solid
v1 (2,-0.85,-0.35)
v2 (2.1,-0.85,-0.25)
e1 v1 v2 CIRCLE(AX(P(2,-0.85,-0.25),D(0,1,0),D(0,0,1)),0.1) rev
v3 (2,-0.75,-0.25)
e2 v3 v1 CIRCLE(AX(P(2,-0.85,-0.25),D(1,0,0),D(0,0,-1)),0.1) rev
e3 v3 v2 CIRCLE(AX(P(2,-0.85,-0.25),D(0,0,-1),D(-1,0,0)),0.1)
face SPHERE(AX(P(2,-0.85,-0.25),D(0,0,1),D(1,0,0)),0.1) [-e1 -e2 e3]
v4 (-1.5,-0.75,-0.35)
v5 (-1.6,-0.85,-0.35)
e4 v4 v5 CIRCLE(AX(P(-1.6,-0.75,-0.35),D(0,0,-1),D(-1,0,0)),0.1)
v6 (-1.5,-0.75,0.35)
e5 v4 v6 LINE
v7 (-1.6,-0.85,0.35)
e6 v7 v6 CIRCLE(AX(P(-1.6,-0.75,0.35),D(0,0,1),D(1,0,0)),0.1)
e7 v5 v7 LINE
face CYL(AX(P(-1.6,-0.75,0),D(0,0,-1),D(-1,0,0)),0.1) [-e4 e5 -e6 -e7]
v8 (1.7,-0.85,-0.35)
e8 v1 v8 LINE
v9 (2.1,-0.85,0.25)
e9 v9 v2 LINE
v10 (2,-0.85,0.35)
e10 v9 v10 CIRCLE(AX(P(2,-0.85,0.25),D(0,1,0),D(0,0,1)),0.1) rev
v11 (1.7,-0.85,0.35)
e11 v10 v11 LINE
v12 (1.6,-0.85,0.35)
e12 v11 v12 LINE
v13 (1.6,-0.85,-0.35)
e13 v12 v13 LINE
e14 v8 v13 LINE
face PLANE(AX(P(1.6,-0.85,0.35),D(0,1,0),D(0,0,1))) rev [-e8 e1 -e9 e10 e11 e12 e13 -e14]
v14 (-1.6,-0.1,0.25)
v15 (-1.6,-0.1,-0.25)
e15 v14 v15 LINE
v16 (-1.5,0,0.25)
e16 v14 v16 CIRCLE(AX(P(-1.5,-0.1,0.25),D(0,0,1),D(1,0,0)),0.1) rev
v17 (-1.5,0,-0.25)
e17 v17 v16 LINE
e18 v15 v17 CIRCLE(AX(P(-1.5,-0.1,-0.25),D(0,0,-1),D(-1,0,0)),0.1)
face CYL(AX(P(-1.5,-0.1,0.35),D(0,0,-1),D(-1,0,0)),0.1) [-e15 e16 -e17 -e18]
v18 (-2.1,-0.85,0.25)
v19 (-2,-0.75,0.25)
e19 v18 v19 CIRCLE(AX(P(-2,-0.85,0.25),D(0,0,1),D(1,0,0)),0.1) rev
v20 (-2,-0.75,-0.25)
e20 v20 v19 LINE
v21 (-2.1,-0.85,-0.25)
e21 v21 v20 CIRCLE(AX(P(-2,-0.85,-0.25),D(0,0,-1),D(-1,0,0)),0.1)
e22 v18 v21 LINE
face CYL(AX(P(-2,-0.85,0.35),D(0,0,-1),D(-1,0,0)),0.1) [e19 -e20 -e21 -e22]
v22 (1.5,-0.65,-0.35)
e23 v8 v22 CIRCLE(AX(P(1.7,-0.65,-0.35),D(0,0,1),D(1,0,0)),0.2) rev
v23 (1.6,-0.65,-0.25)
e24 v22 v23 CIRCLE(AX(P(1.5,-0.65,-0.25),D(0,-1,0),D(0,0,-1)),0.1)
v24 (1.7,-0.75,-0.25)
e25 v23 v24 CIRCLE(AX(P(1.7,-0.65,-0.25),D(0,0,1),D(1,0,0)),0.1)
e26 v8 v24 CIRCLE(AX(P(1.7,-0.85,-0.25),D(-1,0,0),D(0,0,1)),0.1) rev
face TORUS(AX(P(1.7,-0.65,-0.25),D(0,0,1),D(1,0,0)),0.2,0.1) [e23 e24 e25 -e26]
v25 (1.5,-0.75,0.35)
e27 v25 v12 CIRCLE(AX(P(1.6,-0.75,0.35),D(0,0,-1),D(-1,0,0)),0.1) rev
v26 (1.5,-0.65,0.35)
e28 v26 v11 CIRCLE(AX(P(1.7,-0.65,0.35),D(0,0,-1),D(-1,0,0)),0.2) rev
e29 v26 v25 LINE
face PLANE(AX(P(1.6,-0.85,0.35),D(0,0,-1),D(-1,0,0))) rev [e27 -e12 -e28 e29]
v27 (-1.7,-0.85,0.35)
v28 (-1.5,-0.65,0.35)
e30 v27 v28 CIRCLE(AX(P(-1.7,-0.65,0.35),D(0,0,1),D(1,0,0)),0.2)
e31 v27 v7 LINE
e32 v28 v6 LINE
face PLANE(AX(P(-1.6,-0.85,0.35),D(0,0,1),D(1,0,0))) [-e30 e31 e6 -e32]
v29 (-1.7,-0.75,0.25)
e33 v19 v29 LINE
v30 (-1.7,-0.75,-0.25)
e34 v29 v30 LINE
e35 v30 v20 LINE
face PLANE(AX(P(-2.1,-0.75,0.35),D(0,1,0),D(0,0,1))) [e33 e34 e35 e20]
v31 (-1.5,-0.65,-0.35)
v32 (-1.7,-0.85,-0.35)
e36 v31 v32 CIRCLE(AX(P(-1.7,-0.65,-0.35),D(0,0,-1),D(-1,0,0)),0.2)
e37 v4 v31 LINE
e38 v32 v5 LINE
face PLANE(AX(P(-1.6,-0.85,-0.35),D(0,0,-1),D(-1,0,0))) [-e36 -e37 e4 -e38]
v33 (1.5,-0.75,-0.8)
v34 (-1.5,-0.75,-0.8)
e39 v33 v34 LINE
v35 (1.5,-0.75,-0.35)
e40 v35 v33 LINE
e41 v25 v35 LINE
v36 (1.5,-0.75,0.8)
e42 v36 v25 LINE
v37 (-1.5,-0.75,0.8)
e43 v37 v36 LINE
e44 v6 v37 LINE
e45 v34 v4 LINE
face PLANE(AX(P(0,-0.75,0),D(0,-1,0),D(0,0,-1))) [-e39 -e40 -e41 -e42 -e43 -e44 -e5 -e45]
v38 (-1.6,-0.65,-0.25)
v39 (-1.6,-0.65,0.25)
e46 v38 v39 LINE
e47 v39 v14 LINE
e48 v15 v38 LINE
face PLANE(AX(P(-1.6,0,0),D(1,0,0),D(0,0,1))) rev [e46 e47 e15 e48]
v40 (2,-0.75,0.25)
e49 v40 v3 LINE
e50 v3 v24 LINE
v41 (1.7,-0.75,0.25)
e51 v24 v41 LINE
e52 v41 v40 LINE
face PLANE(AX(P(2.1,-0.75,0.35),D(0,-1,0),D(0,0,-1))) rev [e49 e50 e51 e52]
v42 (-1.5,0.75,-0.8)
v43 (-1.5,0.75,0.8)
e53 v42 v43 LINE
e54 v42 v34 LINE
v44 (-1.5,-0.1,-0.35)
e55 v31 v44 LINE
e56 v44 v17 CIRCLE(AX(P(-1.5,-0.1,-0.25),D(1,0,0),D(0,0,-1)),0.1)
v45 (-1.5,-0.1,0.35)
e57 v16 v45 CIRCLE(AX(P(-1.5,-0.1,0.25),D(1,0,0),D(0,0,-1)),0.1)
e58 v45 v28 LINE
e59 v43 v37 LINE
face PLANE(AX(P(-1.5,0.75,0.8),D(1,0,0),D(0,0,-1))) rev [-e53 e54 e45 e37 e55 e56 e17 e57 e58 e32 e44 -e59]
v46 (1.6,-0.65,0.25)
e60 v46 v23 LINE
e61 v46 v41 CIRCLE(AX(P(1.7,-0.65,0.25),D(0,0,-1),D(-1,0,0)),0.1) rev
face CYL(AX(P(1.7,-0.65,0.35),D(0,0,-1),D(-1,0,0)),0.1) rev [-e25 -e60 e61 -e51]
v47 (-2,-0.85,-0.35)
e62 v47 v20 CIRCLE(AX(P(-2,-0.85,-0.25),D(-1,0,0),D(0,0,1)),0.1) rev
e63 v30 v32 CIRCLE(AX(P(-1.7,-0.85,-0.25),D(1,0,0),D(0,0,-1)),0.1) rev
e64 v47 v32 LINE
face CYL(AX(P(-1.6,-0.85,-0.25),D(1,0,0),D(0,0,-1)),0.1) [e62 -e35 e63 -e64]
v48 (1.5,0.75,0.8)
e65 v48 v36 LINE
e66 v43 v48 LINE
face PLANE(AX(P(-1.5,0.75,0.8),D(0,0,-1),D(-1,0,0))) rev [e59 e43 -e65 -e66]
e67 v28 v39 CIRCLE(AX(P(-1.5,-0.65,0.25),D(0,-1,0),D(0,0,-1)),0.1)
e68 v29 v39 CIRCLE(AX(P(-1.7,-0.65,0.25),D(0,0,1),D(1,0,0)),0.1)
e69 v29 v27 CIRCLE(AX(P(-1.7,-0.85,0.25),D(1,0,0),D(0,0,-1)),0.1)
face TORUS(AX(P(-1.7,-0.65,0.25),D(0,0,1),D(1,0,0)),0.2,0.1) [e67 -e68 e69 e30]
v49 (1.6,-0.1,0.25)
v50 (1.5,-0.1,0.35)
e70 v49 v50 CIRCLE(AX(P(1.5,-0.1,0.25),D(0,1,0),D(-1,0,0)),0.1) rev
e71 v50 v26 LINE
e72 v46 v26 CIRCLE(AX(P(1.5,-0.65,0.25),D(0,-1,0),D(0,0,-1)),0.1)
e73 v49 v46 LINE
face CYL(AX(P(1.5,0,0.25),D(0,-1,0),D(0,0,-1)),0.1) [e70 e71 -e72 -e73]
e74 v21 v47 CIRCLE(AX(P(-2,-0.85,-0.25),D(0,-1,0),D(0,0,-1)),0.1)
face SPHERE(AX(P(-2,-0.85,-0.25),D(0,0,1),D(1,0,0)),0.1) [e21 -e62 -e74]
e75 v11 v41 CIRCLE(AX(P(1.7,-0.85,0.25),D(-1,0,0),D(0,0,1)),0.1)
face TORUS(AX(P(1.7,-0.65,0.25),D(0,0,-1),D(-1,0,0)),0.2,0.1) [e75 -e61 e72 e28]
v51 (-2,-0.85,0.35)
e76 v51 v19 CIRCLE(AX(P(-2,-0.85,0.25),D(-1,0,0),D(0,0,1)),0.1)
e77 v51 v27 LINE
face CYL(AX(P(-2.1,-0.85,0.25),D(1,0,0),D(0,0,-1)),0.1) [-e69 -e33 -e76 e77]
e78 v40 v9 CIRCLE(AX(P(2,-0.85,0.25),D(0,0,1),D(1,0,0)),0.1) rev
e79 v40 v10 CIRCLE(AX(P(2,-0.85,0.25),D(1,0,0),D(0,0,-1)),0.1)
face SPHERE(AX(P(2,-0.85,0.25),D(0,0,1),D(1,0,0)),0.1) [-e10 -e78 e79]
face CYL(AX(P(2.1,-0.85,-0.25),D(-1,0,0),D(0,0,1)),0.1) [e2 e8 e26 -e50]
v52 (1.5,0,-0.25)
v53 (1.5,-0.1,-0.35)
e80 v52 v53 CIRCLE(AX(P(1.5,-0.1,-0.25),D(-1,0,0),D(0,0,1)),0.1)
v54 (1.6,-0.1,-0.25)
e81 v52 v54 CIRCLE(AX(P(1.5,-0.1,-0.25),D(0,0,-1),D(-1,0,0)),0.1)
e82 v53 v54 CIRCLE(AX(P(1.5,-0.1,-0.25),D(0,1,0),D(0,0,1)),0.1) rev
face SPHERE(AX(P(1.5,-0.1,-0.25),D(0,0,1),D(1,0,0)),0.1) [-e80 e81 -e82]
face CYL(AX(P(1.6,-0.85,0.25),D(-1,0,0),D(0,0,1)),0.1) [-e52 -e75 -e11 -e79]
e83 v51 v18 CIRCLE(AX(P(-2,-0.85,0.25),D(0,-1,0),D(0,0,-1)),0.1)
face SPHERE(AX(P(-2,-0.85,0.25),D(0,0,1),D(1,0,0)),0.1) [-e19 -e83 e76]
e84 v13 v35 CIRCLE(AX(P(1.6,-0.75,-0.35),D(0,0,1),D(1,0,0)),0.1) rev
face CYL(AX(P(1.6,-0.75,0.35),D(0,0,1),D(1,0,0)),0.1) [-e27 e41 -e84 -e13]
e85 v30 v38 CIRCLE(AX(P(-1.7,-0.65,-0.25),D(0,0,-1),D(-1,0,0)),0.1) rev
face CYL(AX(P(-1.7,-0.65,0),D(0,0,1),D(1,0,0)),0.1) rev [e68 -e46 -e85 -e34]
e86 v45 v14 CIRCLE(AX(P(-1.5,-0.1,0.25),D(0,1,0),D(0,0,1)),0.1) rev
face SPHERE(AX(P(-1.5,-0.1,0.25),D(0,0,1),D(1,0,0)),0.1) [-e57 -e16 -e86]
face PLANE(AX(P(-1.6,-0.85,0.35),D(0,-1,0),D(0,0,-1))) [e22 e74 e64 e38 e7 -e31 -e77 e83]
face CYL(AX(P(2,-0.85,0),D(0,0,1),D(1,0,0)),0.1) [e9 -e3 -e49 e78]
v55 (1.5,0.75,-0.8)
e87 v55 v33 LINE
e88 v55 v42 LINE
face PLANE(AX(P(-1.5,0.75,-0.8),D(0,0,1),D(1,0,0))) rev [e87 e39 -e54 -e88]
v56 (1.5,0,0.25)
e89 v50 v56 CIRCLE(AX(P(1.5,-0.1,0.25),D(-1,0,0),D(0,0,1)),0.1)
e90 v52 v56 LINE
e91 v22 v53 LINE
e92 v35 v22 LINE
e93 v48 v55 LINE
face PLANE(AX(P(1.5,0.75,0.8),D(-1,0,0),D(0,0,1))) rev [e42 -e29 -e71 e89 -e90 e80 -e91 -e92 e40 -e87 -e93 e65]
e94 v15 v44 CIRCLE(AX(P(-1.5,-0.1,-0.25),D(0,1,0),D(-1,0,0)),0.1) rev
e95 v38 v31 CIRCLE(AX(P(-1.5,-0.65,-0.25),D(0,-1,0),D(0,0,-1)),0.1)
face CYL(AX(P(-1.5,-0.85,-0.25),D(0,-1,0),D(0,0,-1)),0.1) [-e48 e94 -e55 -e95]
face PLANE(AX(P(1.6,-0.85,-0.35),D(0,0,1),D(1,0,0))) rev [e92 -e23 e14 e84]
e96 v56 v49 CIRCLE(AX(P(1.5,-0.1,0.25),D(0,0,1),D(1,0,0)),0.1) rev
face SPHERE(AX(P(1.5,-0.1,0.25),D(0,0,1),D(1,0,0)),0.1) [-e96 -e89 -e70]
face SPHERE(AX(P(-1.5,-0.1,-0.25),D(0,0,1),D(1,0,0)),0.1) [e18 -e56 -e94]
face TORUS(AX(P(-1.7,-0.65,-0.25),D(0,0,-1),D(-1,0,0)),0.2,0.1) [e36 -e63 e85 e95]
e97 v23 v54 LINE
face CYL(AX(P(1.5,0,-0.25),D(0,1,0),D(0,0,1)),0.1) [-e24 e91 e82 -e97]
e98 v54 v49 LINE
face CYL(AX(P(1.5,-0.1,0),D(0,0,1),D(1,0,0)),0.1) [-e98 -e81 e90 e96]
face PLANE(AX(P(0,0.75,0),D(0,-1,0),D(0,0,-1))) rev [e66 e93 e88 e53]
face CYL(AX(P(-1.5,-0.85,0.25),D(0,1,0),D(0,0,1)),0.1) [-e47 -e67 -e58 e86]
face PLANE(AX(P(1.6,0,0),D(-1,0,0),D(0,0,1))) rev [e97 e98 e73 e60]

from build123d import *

# Parameters (mm, degrees)
SKETCH1_W            = 3
SKETCH1_H            = 1.6
BOSS_EXTRUDE1_DEPTH  = 0.75
SKETCH2_W            = 0.7
SKETCH2_H            = 0.85
BOSS_EXTRUDE2_DEPTH  = 0.1
SKETCH5_W            = 0.7
SKETCH5_H            = 0.1
BOSS_EXTRUDE4_DEPTH  = 0.5
FILLET4_R            = 0.1
FILLET4_OF_MIRROR1_R = 0.1


with BuildPart() as part:
    # Sketch1 → Boss-Extrude1 (new, symmetric)
    with BuildSketch(Plane(origin=(0, 0, 0), x_dir=(1, 0, 0), z_dir=(0, 1, 0))):
        Rectangle(SKETCH1_W, SKETCH1_H)
    extrude(amount=BOSS_EXTRUDE1_DEPTH, both=True)

    # Sketch2 → Boss-Extrude2 (add)
    with BuildSketch(Plane(origin=(1.5, 0, 0), x_dir=(0, 0, -1), z_dir=(1, 0, 0))):
        with Locations((0, -0.425)):
            Rectangle(SKETCH2_W, SKETCH2_H)
    boss_extrude2 = extrude(amount=BOSS_EXTRUDE2_DEPTH)

    # Sketch5 → Boss-Extrude4 (add)
    with BuildSketch(Plane(origin=(1.6, 0, 0), x_dir=(0, 0, -1), z_dir=(1, 0, 0))):
        with Locations((0, -0.8)):
            Rectangle(SKETCH5_W, SKETCH5_H)
    boss_extrude4 = extrude(amount=BOSS_EXTRUDE4_DEPTH)

    # Fillet4
    fillet4_edges = [part.edges().sort_by_distance(p)[0] for p in [
        (1.6, -0.75, 0),
    ]]
    fillet(fillet4_edges, radius=FILLET4_R)
    fillet4_2_edges = [part.edges().sort_by_distance(p)[0] for p in [
        (2.1, -0.75, 0),
        (1.6, 0, 0),
        (1.5, -0.85, 0),
    ]]
    fillet(fillet4_2_edges, radius=FILLET4_R - 0.0001)  # a hair under: the kernel refuses the full size
    fillet4_3_edges = [part.edges().sort_by_distance(p)[0] for p in [
        (1.85005, -0.75, -0.35),
        (1.85005, -0.75, 0.35),
        (1.6, -0.37495, -0.35),
        (1.6, -0.37495, 0.35),
        (1.570739967, -0.029260033, 0.35),
        (1.629289322, -0.720710678, 0.35),
        (1.629289322, -0.720710678, -0.35),
        (1.570739967, -0.029260033, -0.35),
        (2.070739967, -0.779260033, 0.35),
        (2.070739967, -0.779260033, -0.35),
    ]]
    fillet(fillet4_3_edges, radius=FILLET4_R - 0.0001)  # a hair under: the kernel refuses the full size

    # Mirror1: Boss-Extrude2, Boss-Extrude4 across plane
    add(boss_extrude2.mirror(Plane(origin=(0, 0, 0), x_dir=(0, 0, 1), z_dir=(1, 0, 0))))
    add(boss_extrude4.mirror(Plane(origin=(0, 0, 0), x_dir=(0, 0, 1), z_dir=(1, 0, 0))))

    # Fillet4 of Mirror1
    fillet4_of_mirror1_edges = [part.edges().sort_by_distance(p)[0] for p in [
        (-1.6, -0.75, 0),
    ]]
    fillet(fillet4_of_mirror1_edges, radius=FILLET4_OF_MIRROR1_R)
    fillet4_of_mirror1_2_edges = [part.edges().sort_by_distance(p)[0] for p in [
        (-2.1, -0.75, 0),
        (-1.6, 0, 0),
        (-1.5, -0.85, 0),
    ]]
    fillet(fillet4_of_mirror1_2_edges, radius=FILLET4_OF_MIRROR1_R - 0.0001)  # a hair under: the kernel refuses the full size
    fillet4_of_mirror1_3_edges = [part.edges().sort_by_distance(p)[0] for p in [
        (-1.85005, -0.75, -0.35),
        (-1.85005, -0.75, 0.35),
        (-1.6, -0.37495, -0.35),
        (-1.6, -0.37495, 0.35),
        (-1.570739967, -0.029260033, 0.35),
        (-1.629289322, -0.720710678, 0.35),
        (-1.629289322, -0.720710678, -0.35),
        (-1.570739967, -0.029260033, -0.35),
        (-2.070739967, -0.779260033, 0.35),
        (-2.070739967, -0.779260033, -0.35),
    ]]
    fillet(fillet4_of_mirror1_3_edges, radius=FILLET4_OF_MIRROR1_R - 0.0001)  # a hair under: the kernel refuses the full size


solid = part.part
